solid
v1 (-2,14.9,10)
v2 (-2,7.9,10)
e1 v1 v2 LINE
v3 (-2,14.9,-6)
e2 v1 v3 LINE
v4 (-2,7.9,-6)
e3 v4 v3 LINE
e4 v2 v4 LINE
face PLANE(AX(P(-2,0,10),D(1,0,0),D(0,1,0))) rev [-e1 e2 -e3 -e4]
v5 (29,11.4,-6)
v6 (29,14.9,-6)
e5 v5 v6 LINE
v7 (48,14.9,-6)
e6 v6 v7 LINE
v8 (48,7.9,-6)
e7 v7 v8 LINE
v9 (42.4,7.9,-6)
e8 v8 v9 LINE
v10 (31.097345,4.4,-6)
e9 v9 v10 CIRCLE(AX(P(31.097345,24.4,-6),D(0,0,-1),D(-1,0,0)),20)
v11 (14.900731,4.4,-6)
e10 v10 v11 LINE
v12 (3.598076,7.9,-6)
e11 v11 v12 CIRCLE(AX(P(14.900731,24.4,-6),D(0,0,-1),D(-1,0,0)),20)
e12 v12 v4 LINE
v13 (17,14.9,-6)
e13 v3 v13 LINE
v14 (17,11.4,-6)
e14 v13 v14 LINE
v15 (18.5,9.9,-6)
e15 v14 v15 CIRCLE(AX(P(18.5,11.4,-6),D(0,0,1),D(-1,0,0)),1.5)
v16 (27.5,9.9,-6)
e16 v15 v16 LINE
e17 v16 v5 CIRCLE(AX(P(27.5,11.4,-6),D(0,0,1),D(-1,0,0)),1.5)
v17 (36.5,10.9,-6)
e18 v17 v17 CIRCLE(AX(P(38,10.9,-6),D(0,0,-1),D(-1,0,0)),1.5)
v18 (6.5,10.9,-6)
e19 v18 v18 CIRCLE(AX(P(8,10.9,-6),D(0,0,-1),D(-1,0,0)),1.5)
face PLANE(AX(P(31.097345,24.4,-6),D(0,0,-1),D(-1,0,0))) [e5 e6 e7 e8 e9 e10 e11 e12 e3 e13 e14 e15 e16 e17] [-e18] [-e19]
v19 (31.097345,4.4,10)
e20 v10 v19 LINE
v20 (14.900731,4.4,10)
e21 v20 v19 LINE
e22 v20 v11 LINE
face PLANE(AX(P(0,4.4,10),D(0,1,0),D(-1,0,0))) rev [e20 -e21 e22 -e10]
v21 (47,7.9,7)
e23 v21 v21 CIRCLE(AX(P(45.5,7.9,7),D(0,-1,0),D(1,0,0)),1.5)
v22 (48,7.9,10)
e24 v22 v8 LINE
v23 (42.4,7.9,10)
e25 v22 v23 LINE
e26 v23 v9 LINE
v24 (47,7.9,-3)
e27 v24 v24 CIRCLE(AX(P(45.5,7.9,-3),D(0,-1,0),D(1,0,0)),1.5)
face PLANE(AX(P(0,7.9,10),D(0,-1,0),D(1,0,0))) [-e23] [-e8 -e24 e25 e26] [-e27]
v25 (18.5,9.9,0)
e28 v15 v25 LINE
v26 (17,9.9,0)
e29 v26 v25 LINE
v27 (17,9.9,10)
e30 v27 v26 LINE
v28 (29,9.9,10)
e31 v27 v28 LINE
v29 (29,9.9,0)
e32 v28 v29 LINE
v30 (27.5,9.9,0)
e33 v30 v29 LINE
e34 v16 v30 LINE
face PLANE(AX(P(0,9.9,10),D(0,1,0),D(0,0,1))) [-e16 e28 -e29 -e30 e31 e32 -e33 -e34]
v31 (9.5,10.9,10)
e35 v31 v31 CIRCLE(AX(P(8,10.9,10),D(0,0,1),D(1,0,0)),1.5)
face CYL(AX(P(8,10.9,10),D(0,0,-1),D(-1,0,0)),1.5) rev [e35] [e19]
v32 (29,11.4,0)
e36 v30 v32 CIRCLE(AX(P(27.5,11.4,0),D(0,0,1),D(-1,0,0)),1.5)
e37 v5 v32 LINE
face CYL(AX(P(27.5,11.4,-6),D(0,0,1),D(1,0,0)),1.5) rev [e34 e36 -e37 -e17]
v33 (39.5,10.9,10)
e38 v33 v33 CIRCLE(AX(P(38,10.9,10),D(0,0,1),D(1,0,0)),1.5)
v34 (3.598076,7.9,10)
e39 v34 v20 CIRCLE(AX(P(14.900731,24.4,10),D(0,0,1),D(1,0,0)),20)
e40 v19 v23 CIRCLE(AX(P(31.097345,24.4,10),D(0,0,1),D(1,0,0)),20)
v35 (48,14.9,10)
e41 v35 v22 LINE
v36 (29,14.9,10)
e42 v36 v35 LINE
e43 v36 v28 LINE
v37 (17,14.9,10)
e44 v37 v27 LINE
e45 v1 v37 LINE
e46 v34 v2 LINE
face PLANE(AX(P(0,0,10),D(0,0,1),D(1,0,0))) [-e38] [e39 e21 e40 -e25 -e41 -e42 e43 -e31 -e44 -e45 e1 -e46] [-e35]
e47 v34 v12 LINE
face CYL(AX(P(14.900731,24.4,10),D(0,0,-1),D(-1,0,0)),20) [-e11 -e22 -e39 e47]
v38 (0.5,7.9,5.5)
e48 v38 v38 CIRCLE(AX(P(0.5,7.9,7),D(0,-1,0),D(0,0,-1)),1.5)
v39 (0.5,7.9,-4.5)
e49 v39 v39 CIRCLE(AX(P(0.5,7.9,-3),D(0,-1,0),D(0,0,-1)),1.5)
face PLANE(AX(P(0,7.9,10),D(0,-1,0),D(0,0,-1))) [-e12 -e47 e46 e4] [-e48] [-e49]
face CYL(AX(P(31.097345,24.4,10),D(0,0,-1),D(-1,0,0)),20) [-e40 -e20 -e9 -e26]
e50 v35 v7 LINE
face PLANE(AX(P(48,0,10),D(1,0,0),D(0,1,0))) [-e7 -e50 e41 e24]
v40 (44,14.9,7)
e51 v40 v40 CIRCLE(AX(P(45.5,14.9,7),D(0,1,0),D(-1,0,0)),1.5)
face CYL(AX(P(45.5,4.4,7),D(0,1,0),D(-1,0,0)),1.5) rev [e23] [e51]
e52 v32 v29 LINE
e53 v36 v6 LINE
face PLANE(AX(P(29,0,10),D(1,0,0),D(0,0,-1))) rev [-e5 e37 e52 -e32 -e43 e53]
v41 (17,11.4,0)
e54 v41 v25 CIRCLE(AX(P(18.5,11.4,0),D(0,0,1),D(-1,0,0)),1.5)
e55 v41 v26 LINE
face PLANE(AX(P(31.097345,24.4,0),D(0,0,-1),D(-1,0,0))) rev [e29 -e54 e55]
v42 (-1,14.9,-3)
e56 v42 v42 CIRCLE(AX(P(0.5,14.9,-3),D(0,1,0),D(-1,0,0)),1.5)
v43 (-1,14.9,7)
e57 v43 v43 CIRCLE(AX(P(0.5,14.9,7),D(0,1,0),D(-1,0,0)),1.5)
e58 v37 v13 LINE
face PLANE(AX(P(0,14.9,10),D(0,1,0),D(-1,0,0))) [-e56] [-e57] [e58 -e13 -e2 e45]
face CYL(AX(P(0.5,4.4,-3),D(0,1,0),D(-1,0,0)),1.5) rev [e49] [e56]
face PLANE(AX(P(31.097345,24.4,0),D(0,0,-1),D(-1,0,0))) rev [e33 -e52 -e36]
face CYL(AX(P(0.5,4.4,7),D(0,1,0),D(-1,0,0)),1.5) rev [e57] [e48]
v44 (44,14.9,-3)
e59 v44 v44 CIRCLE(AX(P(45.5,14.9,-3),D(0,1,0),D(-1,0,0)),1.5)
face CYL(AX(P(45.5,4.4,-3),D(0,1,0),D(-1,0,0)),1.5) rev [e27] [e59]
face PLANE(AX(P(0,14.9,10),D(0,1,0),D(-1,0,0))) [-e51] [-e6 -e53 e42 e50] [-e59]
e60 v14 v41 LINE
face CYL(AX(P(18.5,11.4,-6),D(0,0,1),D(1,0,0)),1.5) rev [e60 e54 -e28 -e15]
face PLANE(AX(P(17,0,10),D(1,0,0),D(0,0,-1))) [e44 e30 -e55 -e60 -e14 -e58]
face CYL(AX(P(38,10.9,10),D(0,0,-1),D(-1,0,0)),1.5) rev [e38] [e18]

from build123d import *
from build123d.topology import SkipClean

# Parameters (mm, degrees)
SKETCH7_R               = 1.5
BOSS_EXTRUDE11_DEPTH    = 10
FILLET1_R               = 20
BOSS_EXTRUDE12_START    = 6
SKETCH9_R               = 1.5
BOSS_EXTRUDE12_DEPTH    = 6
CUT_EXTRUDE1_DEPTH      = 51.142297514
CUT_EXTRUDE1_DEPTH_BACK = 51.142297514
SKETCH10_R              = 1.5


with BuildPart() as part:
    # Sketch7 → Boss-Extrude11 (new body)
    with BuildSketch(Plane.XY):
        Polygon((11, 14.9), (-2, 14.9), (-2, 7.9), (3.598076211, 7.9), (3.598076211, 4.4), (42.4, 4.4), (42.4, 7.9), (48, 7.9), (48, 14.9), (35, 14.9), (29, 14.9), (29, 9.9), (17, 9.9), (17, 14.9), align=None)
        with Locations((8, 10.9)):
            Circle(SKETCH7_R, mode=Mode.SUBTRACT)
        with Locations((38, 10.9)):
            Circle(SKETCH7_R, mode=Mode.SUBTRACT)
    extrude(amount=BOSS_EXTRUDE11_DEPTH)

    # Fillet1
    # the kernel refuses this fillet: 20 mm, written as the material it takes off along each edge
    with BuildSketch(Plane(origin=(42.4, 4.4, -28.256636389), x_dir=(-1.4210854715172548e-12, 1.0, 0), z_dir=(0, 0, 1))) as fillet1_piece_1:
        with BuildLine():
            CenterArc((20, 11.302654555), FILLET1_R, 180, 34.41150867)
            Line((0, 11.302654555), (-0.4, 11.302654555))
            Line((-0.4, 11.302654555), (-0.4, 0))
            Line((-0.4, 0), (0, -0.4))
            ThreePointArc((0, -0.4), (1.75, -0.4), (3.17, -0.226053091))
            Line((3.17, -0.226053091), (3.5, 0))
        make_face()
    extrude(amount=66.513272777, mode=Mode.SUBTRACT)
    with BuildSketch(Plane(origin=(3.598076211, 4.4, -28.256636389), x_dir=(1, 0, 0), z_dir=(0, 0, 1))) as fillet1_piece_2:
        with BuildLine():
            CenterArc((11.302654555, 20), FILLET1_R, 235.58849133, 34.41150867)
            Line((0, 3.5), (-0.226053091, 3.17))
            ThreePointArc((-0.226053091, 3.17), (-0.4, 1.75), (-0.4, 0))
            Line((-0.4, 0), (0, -0.4))
            Line((0, -0.4), (11.302654555, -0.4))
            Line((11.302654555, -0.4), (11.302654555, 0))
        make_face()
    extrude(amount=66.513272777, mode=Mode.SUBTRACT)

    # Sketch9 → Boss-Extrude12 (add)
    with SkipClean():  # the faces are left unmerged after this step: merging them gives an invalid solid
        with BuildSketch(Plane(origin=(0, 0, 0), x_dir=(-1, 0, 0), z_dir=(0, 0, -1)).offset(BOSS_EXTRUDE12_START)):
            with BuildLine():
                Line((-48, 7.9), (-42.4, 7.9))
                ThreePointArc((-42.4, 7.9), (-37.013425228, 5.295026825), (-31.097345445, 4.4))
                Line((-31.097345445, 4.4), (-14.900730767, 4.4))
                ThreePointArc((-14.900730767, 4.4), (-8.984650984, 5.295026825), (-3.598076211, 7.9))
                Line((-3.598076211, 7.9), (2, 7.9))
                Line((2, 7.9), (2, 14.9))
                Line((2, 14.9), (-17, 14.9))
                Line((-17, 14.9), (-17, 11.4))
                ThreePointArc((-17, 11.4), (-17.439339828, 10.339339828), (-18.5, 9.9))
                Line((-18.5, 9.9), (-27.5, 9.9))
                ThreePointArc((-27.5, 9.9), (-28.560660172, 10.339339828), (-29, 11.4))
                Line((-29, 11.4), (-29, 14.9))
                Line((-29, 14.9), (-48, 14.9))
                Line((-48, 14.9), (-48, 7.9))
            make_face()
            with Locations((-38, 10.9)):
                Circle(SKETCH9_R, mode=Mode.SUBTRACT)
            with Locations((-8, 10.9)):
                Circle(SKETCH9_R, mode=Mode.SUBTRACT)
        extrude(amount=-BOSS_EXTRUDE12_DEPTH)

    # Sketch10 → Cut-Extrude1 (cut, two sides: drawn at the far end of the back side and taken through both)
    with SkipClean():  # the faces are left unmerged after this step: merging them gives an invalid solid
        with BuildSketch(Plane(origin=(0, 14.9, 0), x_dir=(1, 0, 0), z_dir=(0, 1, 0)).offset(-CUT_EXTRUDE1_DEPTH_BACK)):
            with Locations(Location((0.5, -7, 0), (0, 0, 180))):
                Circle(SKETCH10_R)
            with Locations(Location((0.5, 3, 0), (0, 0, 180))):
                Circle(SKETCH10_R)
            with Locations(Location((45.5, -7, 0), (0, 0, 180))):
                Circle(SKETCH10_R)
            with Locations(Location((45.5, 3, 0), (0, 0, 180))):
                Circle(SKETCH10_R)
        extrude(amount=CUT_EXTRUDE1_DEPTH + CUT_EXTRUDE1_DEPTH_BACK, mode=Mode.SUBTRACT)


solid = part.part
